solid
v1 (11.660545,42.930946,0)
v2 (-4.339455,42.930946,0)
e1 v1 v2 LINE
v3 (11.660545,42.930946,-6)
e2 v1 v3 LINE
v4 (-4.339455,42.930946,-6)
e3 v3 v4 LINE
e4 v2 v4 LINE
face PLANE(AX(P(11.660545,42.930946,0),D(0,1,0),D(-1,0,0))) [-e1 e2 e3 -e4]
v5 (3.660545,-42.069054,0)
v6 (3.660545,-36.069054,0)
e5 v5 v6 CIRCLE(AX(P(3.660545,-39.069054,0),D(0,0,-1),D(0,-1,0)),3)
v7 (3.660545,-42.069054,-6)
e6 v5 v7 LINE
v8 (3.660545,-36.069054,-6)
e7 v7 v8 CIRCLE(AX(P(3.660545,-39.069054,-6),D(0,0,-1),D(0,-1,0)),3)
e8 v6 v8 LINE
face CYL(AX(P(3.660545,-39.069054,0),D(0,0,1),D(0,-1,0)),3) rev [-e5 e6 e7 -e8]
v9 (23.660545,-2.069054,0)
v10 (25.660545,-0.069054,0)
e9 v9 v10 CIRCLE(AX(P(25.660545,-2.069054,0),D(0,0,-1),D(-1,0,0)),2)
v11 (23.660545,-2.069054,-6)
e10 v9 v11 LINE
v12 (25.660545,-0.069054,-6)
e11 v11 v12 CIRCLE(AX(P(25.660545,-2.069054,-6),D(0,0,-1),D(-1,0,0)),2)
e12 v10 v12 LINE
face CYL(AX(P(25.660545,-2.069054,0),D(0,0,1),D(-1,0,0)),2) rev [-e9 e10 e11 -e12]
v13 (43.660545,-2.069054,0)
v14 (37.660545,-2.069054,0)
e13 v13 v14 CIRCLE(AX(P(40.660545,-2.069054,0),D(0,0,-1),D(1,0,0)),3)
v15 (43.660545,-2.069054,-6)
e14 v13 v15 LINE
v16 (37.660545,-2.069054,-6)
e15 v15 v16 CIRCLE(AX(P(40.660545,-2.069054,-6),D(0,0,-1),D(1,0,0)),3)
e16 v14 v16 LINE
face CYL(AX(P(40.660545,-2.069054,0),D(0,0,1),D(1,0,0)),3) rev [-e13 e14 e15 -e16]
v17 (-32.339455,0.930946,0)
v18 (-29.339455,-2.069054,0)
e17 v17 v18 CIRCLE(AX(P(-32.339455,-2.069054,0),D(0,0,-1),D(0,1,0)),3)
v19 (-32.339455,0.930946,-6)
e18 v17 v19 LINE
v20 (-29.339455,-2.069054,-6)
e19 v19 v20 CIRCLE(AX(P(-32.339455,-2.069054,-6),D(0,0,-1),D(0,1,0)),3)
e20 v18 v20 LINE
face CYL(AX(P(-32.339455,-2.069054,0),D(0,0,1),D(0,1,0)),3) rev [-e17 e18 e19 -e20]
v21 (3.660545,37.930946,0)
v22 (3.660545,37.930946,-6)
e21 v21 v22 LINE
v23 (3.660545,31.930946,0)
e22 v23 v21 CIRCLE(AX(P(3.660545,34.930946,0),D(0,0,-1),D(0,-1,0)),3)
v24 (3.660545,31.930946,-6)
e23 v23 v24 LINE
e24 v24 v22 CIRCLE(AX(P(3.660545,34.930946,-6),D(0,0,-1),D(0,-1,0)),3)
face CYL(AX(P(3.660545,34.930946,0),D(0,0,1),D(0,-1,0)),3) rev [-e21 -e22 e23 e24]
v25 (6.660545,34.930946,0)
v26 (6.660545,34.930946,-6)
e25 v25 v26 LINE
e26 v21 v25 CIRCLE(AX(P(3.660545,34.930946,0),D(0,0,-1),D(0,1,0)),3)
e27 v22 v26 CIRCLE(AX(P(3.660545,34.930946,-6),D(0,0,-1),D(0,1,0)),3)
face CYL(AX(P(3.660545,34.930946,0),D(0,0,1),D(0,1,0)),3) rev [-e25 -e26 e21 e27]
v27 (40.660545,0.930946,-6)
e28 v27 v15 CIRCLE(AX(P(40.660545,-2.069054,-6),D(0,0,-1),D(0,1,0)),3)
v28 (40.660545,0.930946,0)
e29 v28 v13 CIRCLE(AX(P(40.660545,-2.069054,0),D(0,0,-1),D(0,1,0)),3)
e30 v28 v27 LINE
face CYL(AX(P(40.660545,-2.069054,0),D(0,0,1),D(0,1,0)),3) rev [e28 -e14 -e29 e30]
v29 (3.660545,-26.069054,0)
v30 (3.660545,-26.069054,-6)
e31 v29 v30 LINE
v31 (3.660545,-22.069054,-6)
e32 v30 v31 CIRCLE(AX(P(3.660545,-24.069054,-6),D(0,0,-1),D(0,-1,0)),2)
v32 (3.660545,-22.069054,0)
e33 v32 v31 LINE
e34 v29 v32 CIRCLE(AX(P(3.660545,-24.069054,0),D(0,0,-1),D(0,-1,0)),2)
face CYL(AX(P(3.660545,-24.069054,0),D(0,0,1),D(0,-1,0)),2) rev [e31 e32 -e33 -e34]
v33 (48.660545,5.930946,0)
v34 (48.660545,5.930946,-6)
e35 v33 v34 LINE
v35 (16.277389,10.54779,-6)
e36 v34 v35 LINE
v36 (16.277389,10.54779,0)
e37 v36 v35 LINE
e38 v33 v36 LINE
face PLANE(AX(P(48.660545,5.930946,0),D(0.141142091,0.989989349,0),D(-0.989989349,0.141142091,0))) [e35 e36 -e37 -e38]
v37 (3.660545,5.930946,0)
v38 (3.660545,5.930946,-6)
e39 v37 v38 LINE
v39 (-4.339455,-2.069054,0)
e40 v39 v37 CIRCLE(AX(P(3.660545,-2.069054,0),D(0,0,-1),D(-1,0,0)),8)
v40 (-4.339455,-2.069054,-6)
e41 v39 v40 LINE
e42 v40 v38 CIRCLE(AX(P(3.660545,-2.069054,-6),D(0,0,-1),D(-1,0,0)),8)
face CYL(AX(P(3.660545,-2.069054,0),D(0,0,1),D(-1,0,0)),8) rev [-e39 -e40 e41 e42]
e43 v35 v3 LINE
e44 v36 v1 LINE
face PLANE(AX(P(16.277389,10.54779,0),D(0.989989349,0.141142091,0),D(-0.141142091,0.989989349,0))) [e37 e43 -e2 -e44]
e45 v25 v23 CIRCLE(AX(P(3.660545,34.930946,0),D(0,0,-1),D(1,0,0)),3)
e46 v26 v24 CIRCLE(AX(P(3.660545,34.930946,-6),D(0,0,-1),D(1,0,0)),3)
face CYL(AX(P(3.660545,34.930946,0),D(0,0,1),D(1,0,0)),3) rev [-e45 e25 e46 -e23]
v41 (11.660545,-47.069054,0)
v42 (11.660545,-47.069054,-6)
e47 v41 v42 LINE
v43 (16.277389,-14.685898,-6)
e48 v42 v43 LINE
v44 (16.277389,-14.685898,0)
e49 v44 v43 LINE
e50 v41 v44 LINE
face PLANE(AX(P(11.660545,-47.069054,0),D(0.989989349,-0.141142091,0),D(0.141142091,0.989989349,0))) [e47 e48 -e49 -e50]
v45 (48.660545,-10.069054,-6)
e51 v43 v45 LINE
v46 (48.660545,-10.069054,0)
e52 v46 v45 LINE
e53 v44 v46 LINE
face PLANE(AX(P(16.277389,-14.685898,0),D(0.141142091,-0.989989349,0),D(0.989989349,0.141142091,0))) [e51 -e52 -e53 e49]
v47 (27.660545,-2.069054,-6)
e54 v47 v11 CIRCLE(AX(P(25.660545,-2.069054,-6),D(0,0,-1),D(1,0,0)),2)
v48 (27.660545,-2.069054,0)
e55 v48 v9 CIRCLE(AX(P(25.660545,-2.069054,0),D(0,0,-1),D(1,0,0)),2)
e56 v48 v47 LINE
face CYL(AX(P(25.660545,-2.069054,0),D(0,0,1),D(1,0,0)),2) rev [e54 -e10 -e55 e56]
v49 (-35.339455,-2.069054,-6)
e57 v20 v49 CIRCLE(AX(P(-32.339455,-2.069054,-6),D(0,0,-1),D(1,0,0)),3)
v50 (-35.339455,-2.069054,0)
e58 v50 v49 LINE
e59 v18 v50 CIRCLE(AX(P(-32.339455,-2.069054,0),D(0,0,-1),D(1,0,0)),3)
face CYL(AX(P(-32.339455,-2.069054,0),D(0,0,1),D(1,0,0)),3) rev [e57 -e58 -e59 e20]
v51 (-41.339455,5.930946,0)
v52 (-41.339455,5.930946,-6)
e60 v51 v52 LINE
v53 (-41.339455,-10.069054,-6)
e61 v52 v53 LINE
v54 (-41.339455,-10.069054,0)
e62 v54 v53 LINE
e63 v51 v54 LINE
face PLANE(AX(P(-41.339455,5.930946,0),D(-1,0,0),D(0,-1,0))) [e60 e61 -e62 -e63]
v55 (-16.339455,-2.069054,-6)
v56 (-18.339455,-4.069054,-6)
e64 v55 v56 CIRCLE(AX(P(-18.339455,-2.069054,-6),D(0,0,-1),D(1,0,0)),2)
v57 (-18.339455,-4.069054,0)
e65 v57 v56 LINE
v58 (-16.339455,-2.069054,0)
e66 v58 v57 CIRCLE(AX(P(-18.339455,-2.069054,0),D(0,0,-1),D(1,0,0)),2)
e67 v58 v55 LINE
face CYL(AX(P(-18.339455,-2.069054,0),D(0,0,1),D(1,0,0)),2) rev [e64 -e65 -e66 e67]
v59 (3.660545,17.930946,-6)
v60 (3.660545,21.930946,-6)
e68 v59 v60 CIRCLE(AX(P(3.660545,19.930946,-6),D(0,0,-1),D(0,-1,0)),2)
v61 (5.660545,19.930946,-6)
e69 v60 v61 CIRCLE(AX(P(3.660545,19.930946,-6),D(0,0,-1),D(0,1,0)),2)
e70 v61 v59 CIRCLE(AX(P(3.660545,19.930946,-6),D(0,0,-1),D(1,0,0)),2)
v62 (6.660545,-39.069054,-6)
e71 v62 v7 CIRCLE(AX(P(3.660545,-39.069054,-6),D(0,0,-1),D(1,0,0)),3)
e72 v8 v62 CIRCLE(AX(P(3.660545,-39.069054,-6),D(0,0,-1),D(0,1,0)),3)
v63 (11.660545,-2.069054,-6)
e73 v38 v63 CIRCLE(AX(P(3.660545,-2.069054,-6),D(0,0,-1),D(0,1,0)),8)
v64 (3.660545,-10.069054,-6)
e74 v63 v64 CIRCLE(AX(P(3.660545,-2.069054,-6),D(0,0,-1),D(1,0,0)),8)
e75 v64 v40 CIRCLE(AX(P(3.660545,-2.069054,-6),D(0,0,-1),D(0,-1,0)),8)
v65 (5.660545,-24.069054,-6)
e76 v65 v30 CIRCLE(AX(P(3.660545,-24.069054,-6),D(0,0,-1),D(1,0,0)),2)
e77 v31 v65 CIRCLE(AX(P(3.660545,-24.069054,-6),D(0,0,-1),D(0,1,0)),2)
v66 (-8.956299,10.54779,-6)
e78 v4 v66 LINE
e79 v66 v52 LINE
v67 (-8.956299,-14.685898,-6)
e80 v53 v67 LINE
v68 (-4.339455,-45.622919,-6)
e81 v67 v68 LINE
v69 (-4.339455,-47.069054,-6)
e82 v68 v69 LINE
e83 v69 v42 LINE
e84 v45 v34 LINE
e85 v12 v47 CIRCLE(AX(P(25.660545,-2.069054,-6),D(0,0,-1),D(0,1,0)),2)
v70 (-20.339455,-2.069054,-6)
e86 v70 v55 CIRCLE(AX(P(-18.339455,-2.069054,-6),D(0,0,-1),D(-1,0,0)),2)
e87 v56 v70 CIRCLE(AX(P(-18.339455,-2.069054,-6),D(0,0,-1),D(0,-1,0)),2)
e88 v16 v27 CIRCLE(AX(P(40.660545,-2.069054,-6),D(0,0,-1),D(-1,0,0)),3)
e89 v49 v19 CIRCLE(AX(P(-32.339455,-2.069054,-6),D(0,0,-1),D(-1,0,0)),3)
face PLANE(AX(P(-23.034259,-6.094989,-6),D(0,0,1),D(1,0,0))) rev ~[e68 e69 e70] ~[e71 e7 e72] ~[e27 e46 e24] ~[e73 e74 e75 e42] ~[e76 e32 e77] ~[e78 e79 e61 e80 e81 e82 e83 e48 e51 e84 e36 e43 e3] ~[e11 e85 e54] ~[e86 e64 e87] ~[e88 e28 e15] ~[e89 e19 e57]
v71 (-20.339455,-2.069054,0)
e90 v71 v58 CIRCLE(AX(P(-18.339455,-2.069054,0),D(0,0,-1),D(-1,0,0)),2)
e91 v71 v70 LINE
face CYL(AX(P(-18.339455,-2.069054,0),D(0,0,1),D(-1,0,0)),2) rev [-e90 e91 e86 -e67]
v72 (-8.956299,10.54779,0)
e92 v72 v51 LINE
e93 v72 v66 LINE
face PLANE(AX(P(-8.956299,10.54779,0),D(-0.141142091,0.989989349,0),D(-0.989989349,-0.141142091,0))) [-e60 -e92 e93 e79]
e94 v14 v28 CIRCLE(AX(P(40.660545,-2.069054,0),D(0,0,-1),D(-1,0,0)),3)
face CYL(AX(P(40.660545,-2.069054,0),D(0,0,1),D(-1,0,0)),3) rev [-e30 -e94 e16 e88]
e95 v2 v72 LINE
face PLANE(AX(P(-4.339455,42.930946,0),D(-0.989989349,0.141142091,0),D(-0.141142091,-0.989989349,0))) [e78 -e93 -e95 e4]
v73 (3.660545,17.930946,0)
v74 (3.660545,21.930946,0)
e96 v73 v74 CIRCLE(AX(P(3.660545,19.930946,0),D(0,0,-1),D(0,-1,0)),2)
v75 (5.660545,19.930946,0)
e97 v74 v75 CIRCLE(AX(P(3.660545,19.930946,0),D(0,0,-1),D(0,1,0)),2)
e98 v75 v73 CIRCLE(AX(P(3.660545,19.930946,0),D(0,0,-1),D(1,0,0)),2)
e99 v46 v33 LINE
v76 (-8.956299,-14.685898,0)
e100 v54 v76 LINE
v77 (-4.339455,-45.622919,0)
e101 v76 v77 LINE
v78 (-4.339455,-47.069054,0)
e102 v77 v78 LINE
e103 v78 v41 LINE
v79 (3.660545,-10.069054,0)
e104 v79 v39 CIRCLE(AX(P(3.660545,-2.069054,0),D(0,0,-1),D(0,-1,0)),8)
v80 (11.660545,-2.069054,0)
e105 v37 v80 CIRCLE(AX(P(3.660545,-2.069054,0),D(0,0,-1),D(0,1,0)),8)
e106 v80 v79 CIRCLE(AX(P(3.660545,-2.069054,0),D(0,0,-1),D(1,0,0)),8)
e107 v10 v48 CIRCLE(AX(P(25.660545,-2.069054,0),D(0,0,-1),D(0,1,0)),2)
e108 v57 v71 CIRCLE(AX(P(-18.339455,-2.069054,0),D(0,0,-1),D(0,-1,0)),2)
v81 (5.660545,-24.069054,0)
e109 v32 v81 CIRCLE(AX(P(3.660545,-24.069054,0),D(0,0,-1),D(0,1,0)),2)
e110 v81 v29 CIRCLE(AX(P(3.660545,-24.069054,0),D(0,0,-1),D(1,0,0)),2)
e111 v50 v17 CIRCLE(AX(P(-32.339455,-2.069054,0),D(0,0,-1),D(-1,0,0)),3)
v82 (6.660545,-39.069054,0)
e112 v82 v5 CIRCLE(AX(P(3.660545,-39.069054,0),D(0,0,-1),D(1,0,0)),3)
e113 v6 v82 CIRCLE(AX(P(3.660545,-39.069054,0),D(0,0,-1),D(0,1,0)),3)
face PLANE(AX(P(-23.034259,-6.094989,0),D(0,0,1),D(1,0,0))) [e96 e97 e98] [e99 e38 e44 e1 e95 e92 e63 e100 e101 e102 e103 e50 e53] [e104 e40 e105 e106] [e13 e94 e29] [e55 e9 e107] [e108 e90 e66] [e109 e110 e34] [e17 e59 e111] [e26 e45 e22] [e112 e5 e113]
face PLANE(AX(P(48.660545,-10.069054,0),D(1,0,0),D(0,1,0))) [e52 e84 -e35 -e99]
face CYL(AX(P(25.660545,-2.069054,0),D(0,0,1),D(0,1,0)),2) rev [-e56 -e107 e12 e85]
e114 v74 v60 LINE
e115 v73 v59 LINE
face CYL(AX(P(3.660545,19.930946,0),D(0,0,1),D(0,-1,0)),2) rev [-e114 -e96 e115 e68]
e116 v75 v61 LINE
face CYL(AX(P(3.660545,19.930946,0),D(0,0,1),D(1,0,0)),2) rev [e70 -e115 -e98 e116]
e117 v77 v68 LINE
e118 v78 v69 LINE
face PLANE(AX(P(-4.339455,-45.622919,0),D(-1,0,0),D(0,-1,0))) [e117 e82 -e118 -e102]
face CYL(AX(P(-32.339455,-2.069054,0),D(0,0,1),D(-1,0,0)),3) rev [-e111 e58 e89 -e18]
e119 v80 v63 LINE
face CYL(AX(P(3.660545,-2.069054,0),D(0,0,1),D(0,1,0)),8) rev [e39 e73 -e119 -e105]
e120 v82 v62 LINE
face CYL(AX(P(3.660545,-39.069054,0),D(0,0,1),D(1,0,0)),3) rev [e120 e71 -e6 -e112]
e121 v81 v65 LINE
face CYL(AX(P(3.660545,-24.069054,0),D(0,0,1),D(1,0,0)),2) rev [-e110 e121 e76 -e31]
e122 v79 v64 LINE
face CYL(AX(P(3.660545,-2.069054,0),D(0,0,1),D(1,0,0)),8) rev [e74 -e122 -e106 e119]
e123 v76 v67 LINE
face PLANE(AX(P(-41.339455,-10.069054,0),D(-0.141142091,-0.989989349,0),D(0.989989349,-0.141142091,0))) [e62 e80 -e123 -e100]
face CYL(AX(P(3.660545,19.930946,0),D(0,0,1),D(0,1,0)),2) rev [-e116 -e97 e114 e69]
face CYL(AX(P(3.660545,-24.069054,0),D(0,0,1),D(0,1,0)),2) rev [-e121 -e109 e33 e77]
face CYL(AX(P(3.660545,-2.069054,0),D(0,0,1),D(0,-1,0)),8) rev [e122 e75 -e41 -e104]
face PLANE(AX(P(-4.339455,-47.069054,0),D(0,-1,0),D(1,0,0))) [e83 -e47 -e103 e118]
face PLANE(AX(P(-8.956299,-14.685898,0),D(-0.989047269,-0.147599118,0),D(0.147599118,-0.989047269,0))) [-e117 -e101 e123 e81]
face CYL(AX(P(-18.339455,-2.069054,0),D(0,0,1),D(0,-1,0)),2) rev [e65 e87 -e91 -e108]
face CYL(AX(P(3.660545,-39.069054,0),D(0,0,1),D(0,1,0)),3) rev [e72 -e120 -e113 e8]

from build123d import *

# Parameters (mm, degrees)
F1_DEPTH = 6


with BuildPart() as f1:
    # F0 (on Top) → F1 (new body)
    with BuildSketch(Plane.XY):
        with BuildLine():
            Line((-4.3394552469, -10.0690543538), (-4.3394552469, -2.0690543538))
            Line((-4.3394552469, -2.0690543538), (-16.3394552469, -2.0690543538))
            ThreePointArc((-16.3394552469, -2.0690543538), (-16.9252416846, -3.4832679161), (-18.3394552469, -4.0690543538))
            ThreePointArc((-18.3394552469, -4.0690543538), (-19.7536688093, -3.4832679161), (-20.3394552469, -2.0690543538))
            Line((-20.3394552469, -2.0690543538), (-29.3394552469, -2.0690543538))
            ThreePointArc((-29.3394552469, -2.0690543538), (-32.3394552469, -5.0690543538), (-35.3394552469, -2.0690543538))
            Line((-35.3394552469, -2.0690543538), (-41.3394552469, -2.0690543538))
            Line((-41.3394552469, -2.0690543538), (-41.3394552469, -5.0690543538))
            Line((-41.3394552469, -5.0690543538), (-41.3394552469, -10.0690543538))
            Line((-41.3394552469, -10.0690543538), (-36.3394552469, -10.0690543538))
            Line((-36.3394552469, -10.0690543538), (-13.5731431865, -10.0690543538))
            Line((-13.5731431865, -10.0690543538), (-13.1868220354, -10.0690543538))
            Line((-13.1868220354, -10.0690543538), (-4.3394552469, -10.0690543538))
        make_face()
        with BuildLine():
            Line((-4.3394552469, 5.9309456462), (-4.3394552469, -2.0690543538))
            ThreePointArc((-4.3394552469, -2.0690543538), (-1.9963094964, 3.5877998957), (3.6605447531, 5.9309456462))
            Line((3.6605447531, 5.9309456462), (-4.3394552469, 5.9309456462))
        make_face()
        with BuildLine():
            ThreePointArc((3.6605447531, -10.0690543538), (-1.9963094964, -7.7259086033), (-4.3394552469, -2.0690543538))
            Line((-4.3394552469, -2.0690543538), (-4.3394552469, -10.0690543538))
            Line((-4.3394552469, -10.0690543538), (3.6605447531, -10.0690543538))
        make_face()
        with BuildLine():
            Line((-16.3394552469, -2.0690543538), (-4.3394552469, -2.0690543538))
            Line((-4.3394552469, -2.0690543538), (-4.3394552469, 5.9309456462))
            Line((-4.3394552469, 5.9309456462), (-11.6972615942, 5.9309456462))
            Line((-11.6972615942, 5.9309456462), (-13.5731431865, 5.9309456462))
            Line((-13.5731431865, 5.9309456462), (-36.3394552469, 5.9309456462))
            Line((-36.3394552469, 5.9309456462), (-41.3394552469, 5.9309456462))
            Line((-41.3394552469, 5.9309456462), (-41.3394552469, 0.9309456462))
            Line((-41.3394552469, 0.9309456462), (-41.3394552469, -2.0690543538))
            Line((-41.3394552469, -2.0690543538), (-35.3394552469, -2.0690543538))
            ThreePointArc((-35.3394552469, -2.0690543538), (-34.4607755905, 0.0522659898), (-32.3394552469, 0.9309456462))
            ThreePointArc((-32.3394552469, 0.9309456462), (-30.2181349034, 0.0522659898), (-29.3394552469, -2.0690543538))
            Line((-29.3394552469, -2.0690543538), (-20.3394552469, -2.0690543538))
            ThreePointArc((-20.3394552469, -2.0690543538), (-18.3394552469, -0.0690543538), (-16.3394552469, -2.0690543538))
        make_face()
        with BuildLine():
            Line((11.6605447531, 5.9309456462), (3.6605447531, 5.9309456462))
            ThreePointArc((3.6605447531, 5.9309456462), (9.3173990026, 3.5877998957), (11.6605447531, -2.0690543538))
            Line((11.6605447531, -2.0690543538), (11.6605447531, 5.9309456462))
        make_face()
        with BuildLine():
            Line((-4.3394552469, 5.9309456462), (3.6605447531, 5.9309456462))
            Line((3.6605447531, 5.9309456462), (3.6605447531, 17.9309456462))
            ThreePointArc((3.6605447531, 17.9309456462), (1.6605447531, 19.9309456462), (3.6605447531, 21.9309456462))
            Line((3.6605447531, 21.9309456462), (3.6605447531, 31.9309456462))
            ThreePointArc((3.6605447531, 31.9309456462), (0.6605447531, 34.9309456462), (3.6605447531, 37.9309456462))
            Line((3.6605447531, 37.9309456462), (3.6605447531, 42.9309456462))
            Line((3.6605447531, 42.9309456462), (0.6605447531, 42.9309456462))
            Line((0.6605447531, 42.9309456462), (-4.3394552469, 42.9309456462))
            Line((-4.3394552469, 42.9309456462), (-4.3394552469, 37.9309456462))
            Line((-4.3394552469, 37.9309456462), (-4.3394552469, 15.1646335859))
            Line((-4.3394552469, 15.1646335859), (-4.3394552469, 14.7783124347))
            Line((-4.3394552469, 14.7783124347), (-4.3394552469, 5.9309456462))
        make_face()
        with BuildLine():
            Line((3.6605447531, 17.9309456462), (3.6605447531, 5.9309456462))
            Line((3.6605447531, 5.9309456462), (11.6605447531, 5.9309456462))
            Line((11.6605447531, 5.9309456462), (11.6605447531, 13.2887519935))
            Line((11.6605447531, 13.2887519935), (11.6605447531, 15.1646335859))
            Line((11.6605447531, 15.1646335859), (11.6605447531, 37.9309456462))
            Line((11.6605447531, 37.9309456462), (11.6605447531, 42.9309456462))
            Line((11.6605447531, 42.9309456462), (6.6605447531, 42.9309456462))
            Line((6.6605447531, 42.9309456462), (3.6605447531, 42.9309456462))
            Line((3.6605447531, 42.9309456462), (3.6605447531, 37.9309456462))
            ThreePointArc((3.6605447531, 37.9309456462), (5.7818650966, 37.0522659898), (6.6605447531, 34.9309456462))
            ThreePointArc((6.6605447531, 34.9309456462), (5.7818650966, 32.8096253027), (3.6605447531, 31.9309456462))
            Line((3.6605447531, 31.9309456462), (3.6605447531, 21.9309456462))
            ThreePointArc((3.6605447531, 21.9309456462), (5.0747583154, 21.3451592086), (5.6605447531, 19.9309456462))
            ThreePointArc((5.6605447531, 19.9309456462), (5.0747583154, 18.5167320839), (3.6605447531, 17.9309456462))
        make_face()
        with BuildLine():
            Line((11.6605447531, -10.0690543538), (3.6605447531, -10.0690543538))
            Line((3.6605447531, -10.0690543538), (3.6605447531, -22.0690543538))
            ThreePointArc((3.6605447531, -22.0690543538), (5.0747583154, -22.6548407914), (5.6605447531, -24.0690543538))
            ThreePointArc((5.6605447531, -24.0690543538), (5.0747583154, -25.4832679161), (3.6605447531, -26.0690543538))
            Line((3.6605447531, -26.0690543538), (3.6605447531, -36.0690543538))
            ThreePointArc((3.6605447531, -36.0690543538), (5.7818650966, -36.9477340102), (6.6605447531, -39.0690543538))
            ThreePointArc((6.6605447531, -39.0690543538), (5.7818650966, -41.1903746973), (3.6605447531, -42.0690543538))
            Line((3.6605447531, -42.0690543538), (3.6605447531, -47.0690543538))
            Line((3.6605447531, -47.0690543538), (6.6605447531, -47.0690543538))
            Line((6.6605447531, -47.0690543538), (11.6605447531, -47.0690543538))
            Line((11.6605447531, -47.0690543538), (11.6605447531, -42.0690543538))
            Line((11.6605447531, -42.0690543538), (11.6605447531, -19.3027422934))
            Line((11.6605447531, -19.3027422934), (11.6605447531, -18.9164211423))
            Line((11.6605447531, -18.9164211423), (11.6605447531, -10.0690543538))
        make_face()
        with BuildLine():
            Line((3.6605447531, -22.0690543538), (3.6605447531, -10.0690543538))
            Line((3.6605447531, -10.0690543538), (-4.3394552469, -10.0690543538))
            Line((-4.3394552469, -10.0690543538), (-4.3394552469, -17.4268607011))
            Line((-4.3394552469, -17.4268607011), (-4.3394552469, -19.3027422934))
            Line((-4.3394552469, -19.3027422934), (-4.3394552469, -42.0690543538))
            Line((-4.3394552469, -42.0690543538), (-4.3394552469, -45.6229187548))
            Line((-4.3394552469, -45.6229187548), (-4.3394552469, -47.0690543538))
            Line((-4.3394552469, -47.0690543538), (0.6605447531, -47.0690543538))
            Line((0.6605447531, -47.0690543538), (3.6605447531, -47.0690543538))
            Line((3.6605447531, -47.0690543538), (3.6605447531, -42.0690543538))
            ThreePointArc((3.6605447531, -42.0690543538), (0.6605447531, -39.0690543538), (3.6605447531, -36.0690543538))
            Line((3.6605447531, -36.0690543538), (3.6605447531, -26.0690543538))
            ThreePointArc((3.6605447531, -26.0690543538), (1.6605447531, -24.0690543538), (3.6605447531, -22.0690543538))
        make_face()
        with BuildLine():
            ThreePointArc((11.6605447531, -2.0690543538), (9.3173990026, -7.7259086033), (3.6605447531, -10.0690543538))
            Line((3.6605447531, -10.0690543538), (11.6605447531, -10.0690543538))
            Line((11.6605447531, -10.0690543538), (11.6605447531, -2.0690543538))
        make_face()
        with BuildLine():
            Line((11.6605447531, 5.9309456462), (11.6605447531, -2.0690543538))
            Line((11.6605447531, -2.0690543538), (23.6605447531, -2.0690543538))
            ThreePointArc((23.6605447531, -2.0690543538), (24.2463311907, -0.6548407914), (25.6605447531, -0.0690543538))
            ThreePointArc((25.6605447531, -0.0690543538), (27.0747583154, -0.6548407914), (27.6605447531, -2.0690543538))
            Line((27.6605447531, -2.0690543538), (37.6605447531, -2.0690543538))
            ThreePointArc((37.6605447531, -2.0690543538), (38.5392244095, 0.0522659898), (40.6605447531, 0.9309456462))
            ThreePointArc((40.6605447531, 0.9309456462), (42.7818650966, 0.0522659898), (43.6605447531, -2.0690543538))
            Line((43.6605447531, -2.0690543538), (48.6605447531, -2.0690543538))
            Line((48.6605447531, -2.0690543538), (48.6605447531, 0.9309456462))
            Line((48.6605447531, 0.9309456462), (48.6605447531, 5.9309456462))
            Line((48.6605447531, 5.9309456462), (43.6605447531, 5.9309456462))
            Line((43.6605447531, 5.9309456462), (20.8942326927, 5.9309456462))
            Line((20.8942326927, 5.9309456462), (20.5079115416, 5.9309456462))
            Line((20.5079115416, 5.9309456462), (11.6605447531, 5.9309456462))
        make_face()
        with BuildLine():
            Line((23.6605447531, -2.0690543538), (11.6605447531, -2.0690543538))
            Line((11.6605447531, -2.0690543538), (11.6605447531, -10.0690543538))
            Line((11.6605447531, -10.0690543538), (19.0183511004, -10.0690543538))
            Line((19.0183511004, -10.0690543538), (20.8942326927, -10.0690543538))
            Line((20.8942326927, -10.0690543538), (43.6605447531, -10.0690543538))
            Line((43.6605447531, -10.0690543538), (48.6605447531, -10.0690543538))
            Line((48.6605447531, -10.0690543538), (48.6605447531, -5.0690543538))
            Line((48.6605447531, -5.0690543538), (48.6605447531, -2.0690543538))
            Line((48.6605447531, -2.0690543538), (43.6605447531, -2.0690543538))
            ThreePointArc((43.6605447531, -2.0690543538), (40.6605447531, -5.0690543538), (37.6605447531, -2.0690543538))
            Line((37.6605447531, -2.0690543538), (27.6605447531, -2.0690543538))
            ThreePointArc((27.6605447531, -2.0690543538), (25.6605447531, -4.0690543538), (23.6605447531, -2.0690543538))
        make_face()
        Polygon((-4.3394552469, -17.4268607011), (-4.3394552469, -10.0690543538), (-13.1868220354, -10.0690543538), (-13.5731431865, -10.0690543538), (-8.9562992167, -14.6858983236), (-4.3394552469, -19.3027422934), align=None)
        Polygon((-11.6972615942, 5.9309456462), (-4.3394552469, 5.9309456462), (-4.3394552469, 14.7783124347), (-4.3394552469, 15.1646335859), (-8.9562992167, 10.547789616), (-13.5731431865, 5.9309456462), align=None)
        Polygon((11.6605447531, 13.2887519935), (11.6605447531, 5.9309456462), (20.5079115416, 5.9309456462), (20.8942326927, 5.9309456462), (16.2773887229, 10.547789616), (11.6605447531, 15.1646335859), align=None)
        Polygon((19.0183511004, -10.0690543538), (11.6605447531, -10.0690543538), (11.6605447531, -18.9164211423), (11.6605447531, -19.3027422934), (16.2773887229, -14.6858983236), (20.8942326927, -10.0690543538), align=None)
        Polygon((-4.3394552469, -42.0690543538), (-4.3394552469, -19.3027422934), (-8.9562992167, -14.6858983236), (-4.3394552469, -45.6229187548), align=None)
        Polygon((-8.9562992167, -14.6858983236), (-13.5731431865, -10.0690543538), (-36.3394552469, -10.0690543538), (-41.3394552469, -10.0690543538), align=None)
        Polygon((-8.9562992167, 10.547789616), (-4.3394552469, 15.1646335859), (-4.3394552469, 37.9309456462), (-4.3394552469, 42.9309456462), align=None)
        Polygon((-36.3394552469, 5.9309456462), (-13.5731431865, 5.9309456462), (-8.9562992167, 10.547789616), (-41.3394552469, 5.9309456462), align=None)
        Polygon((11.6605447531, 37.9309456462), (11.6605447531, 15.1646335859), (16.2773887229, 10.547789616), (11.6605447531, 42.9309456462), align=None)
        Polygon((16.2773887229, 10.547789616), (20.8942326927, 5.9309456462), (43.6605447531, 5.9309456462), (48.6605447531, 5.9309456462), align=None)
        Polygon((16.2773887229, -14.6858983236), (11.6605447531, -19.3027422934), (11.6605447531, -42.0690543538), (11.6605447531, -47.0690543538), align=None)
        Polygon((43.6605447531, -10.0690543538), (20.8942326927, -10.0690543538), (16.2773887229, -14.6858983236), (48.6605447531, -10.0690543538), align=None)
    extrude(amount=-F1_DEPTH)


solid = f1.part
